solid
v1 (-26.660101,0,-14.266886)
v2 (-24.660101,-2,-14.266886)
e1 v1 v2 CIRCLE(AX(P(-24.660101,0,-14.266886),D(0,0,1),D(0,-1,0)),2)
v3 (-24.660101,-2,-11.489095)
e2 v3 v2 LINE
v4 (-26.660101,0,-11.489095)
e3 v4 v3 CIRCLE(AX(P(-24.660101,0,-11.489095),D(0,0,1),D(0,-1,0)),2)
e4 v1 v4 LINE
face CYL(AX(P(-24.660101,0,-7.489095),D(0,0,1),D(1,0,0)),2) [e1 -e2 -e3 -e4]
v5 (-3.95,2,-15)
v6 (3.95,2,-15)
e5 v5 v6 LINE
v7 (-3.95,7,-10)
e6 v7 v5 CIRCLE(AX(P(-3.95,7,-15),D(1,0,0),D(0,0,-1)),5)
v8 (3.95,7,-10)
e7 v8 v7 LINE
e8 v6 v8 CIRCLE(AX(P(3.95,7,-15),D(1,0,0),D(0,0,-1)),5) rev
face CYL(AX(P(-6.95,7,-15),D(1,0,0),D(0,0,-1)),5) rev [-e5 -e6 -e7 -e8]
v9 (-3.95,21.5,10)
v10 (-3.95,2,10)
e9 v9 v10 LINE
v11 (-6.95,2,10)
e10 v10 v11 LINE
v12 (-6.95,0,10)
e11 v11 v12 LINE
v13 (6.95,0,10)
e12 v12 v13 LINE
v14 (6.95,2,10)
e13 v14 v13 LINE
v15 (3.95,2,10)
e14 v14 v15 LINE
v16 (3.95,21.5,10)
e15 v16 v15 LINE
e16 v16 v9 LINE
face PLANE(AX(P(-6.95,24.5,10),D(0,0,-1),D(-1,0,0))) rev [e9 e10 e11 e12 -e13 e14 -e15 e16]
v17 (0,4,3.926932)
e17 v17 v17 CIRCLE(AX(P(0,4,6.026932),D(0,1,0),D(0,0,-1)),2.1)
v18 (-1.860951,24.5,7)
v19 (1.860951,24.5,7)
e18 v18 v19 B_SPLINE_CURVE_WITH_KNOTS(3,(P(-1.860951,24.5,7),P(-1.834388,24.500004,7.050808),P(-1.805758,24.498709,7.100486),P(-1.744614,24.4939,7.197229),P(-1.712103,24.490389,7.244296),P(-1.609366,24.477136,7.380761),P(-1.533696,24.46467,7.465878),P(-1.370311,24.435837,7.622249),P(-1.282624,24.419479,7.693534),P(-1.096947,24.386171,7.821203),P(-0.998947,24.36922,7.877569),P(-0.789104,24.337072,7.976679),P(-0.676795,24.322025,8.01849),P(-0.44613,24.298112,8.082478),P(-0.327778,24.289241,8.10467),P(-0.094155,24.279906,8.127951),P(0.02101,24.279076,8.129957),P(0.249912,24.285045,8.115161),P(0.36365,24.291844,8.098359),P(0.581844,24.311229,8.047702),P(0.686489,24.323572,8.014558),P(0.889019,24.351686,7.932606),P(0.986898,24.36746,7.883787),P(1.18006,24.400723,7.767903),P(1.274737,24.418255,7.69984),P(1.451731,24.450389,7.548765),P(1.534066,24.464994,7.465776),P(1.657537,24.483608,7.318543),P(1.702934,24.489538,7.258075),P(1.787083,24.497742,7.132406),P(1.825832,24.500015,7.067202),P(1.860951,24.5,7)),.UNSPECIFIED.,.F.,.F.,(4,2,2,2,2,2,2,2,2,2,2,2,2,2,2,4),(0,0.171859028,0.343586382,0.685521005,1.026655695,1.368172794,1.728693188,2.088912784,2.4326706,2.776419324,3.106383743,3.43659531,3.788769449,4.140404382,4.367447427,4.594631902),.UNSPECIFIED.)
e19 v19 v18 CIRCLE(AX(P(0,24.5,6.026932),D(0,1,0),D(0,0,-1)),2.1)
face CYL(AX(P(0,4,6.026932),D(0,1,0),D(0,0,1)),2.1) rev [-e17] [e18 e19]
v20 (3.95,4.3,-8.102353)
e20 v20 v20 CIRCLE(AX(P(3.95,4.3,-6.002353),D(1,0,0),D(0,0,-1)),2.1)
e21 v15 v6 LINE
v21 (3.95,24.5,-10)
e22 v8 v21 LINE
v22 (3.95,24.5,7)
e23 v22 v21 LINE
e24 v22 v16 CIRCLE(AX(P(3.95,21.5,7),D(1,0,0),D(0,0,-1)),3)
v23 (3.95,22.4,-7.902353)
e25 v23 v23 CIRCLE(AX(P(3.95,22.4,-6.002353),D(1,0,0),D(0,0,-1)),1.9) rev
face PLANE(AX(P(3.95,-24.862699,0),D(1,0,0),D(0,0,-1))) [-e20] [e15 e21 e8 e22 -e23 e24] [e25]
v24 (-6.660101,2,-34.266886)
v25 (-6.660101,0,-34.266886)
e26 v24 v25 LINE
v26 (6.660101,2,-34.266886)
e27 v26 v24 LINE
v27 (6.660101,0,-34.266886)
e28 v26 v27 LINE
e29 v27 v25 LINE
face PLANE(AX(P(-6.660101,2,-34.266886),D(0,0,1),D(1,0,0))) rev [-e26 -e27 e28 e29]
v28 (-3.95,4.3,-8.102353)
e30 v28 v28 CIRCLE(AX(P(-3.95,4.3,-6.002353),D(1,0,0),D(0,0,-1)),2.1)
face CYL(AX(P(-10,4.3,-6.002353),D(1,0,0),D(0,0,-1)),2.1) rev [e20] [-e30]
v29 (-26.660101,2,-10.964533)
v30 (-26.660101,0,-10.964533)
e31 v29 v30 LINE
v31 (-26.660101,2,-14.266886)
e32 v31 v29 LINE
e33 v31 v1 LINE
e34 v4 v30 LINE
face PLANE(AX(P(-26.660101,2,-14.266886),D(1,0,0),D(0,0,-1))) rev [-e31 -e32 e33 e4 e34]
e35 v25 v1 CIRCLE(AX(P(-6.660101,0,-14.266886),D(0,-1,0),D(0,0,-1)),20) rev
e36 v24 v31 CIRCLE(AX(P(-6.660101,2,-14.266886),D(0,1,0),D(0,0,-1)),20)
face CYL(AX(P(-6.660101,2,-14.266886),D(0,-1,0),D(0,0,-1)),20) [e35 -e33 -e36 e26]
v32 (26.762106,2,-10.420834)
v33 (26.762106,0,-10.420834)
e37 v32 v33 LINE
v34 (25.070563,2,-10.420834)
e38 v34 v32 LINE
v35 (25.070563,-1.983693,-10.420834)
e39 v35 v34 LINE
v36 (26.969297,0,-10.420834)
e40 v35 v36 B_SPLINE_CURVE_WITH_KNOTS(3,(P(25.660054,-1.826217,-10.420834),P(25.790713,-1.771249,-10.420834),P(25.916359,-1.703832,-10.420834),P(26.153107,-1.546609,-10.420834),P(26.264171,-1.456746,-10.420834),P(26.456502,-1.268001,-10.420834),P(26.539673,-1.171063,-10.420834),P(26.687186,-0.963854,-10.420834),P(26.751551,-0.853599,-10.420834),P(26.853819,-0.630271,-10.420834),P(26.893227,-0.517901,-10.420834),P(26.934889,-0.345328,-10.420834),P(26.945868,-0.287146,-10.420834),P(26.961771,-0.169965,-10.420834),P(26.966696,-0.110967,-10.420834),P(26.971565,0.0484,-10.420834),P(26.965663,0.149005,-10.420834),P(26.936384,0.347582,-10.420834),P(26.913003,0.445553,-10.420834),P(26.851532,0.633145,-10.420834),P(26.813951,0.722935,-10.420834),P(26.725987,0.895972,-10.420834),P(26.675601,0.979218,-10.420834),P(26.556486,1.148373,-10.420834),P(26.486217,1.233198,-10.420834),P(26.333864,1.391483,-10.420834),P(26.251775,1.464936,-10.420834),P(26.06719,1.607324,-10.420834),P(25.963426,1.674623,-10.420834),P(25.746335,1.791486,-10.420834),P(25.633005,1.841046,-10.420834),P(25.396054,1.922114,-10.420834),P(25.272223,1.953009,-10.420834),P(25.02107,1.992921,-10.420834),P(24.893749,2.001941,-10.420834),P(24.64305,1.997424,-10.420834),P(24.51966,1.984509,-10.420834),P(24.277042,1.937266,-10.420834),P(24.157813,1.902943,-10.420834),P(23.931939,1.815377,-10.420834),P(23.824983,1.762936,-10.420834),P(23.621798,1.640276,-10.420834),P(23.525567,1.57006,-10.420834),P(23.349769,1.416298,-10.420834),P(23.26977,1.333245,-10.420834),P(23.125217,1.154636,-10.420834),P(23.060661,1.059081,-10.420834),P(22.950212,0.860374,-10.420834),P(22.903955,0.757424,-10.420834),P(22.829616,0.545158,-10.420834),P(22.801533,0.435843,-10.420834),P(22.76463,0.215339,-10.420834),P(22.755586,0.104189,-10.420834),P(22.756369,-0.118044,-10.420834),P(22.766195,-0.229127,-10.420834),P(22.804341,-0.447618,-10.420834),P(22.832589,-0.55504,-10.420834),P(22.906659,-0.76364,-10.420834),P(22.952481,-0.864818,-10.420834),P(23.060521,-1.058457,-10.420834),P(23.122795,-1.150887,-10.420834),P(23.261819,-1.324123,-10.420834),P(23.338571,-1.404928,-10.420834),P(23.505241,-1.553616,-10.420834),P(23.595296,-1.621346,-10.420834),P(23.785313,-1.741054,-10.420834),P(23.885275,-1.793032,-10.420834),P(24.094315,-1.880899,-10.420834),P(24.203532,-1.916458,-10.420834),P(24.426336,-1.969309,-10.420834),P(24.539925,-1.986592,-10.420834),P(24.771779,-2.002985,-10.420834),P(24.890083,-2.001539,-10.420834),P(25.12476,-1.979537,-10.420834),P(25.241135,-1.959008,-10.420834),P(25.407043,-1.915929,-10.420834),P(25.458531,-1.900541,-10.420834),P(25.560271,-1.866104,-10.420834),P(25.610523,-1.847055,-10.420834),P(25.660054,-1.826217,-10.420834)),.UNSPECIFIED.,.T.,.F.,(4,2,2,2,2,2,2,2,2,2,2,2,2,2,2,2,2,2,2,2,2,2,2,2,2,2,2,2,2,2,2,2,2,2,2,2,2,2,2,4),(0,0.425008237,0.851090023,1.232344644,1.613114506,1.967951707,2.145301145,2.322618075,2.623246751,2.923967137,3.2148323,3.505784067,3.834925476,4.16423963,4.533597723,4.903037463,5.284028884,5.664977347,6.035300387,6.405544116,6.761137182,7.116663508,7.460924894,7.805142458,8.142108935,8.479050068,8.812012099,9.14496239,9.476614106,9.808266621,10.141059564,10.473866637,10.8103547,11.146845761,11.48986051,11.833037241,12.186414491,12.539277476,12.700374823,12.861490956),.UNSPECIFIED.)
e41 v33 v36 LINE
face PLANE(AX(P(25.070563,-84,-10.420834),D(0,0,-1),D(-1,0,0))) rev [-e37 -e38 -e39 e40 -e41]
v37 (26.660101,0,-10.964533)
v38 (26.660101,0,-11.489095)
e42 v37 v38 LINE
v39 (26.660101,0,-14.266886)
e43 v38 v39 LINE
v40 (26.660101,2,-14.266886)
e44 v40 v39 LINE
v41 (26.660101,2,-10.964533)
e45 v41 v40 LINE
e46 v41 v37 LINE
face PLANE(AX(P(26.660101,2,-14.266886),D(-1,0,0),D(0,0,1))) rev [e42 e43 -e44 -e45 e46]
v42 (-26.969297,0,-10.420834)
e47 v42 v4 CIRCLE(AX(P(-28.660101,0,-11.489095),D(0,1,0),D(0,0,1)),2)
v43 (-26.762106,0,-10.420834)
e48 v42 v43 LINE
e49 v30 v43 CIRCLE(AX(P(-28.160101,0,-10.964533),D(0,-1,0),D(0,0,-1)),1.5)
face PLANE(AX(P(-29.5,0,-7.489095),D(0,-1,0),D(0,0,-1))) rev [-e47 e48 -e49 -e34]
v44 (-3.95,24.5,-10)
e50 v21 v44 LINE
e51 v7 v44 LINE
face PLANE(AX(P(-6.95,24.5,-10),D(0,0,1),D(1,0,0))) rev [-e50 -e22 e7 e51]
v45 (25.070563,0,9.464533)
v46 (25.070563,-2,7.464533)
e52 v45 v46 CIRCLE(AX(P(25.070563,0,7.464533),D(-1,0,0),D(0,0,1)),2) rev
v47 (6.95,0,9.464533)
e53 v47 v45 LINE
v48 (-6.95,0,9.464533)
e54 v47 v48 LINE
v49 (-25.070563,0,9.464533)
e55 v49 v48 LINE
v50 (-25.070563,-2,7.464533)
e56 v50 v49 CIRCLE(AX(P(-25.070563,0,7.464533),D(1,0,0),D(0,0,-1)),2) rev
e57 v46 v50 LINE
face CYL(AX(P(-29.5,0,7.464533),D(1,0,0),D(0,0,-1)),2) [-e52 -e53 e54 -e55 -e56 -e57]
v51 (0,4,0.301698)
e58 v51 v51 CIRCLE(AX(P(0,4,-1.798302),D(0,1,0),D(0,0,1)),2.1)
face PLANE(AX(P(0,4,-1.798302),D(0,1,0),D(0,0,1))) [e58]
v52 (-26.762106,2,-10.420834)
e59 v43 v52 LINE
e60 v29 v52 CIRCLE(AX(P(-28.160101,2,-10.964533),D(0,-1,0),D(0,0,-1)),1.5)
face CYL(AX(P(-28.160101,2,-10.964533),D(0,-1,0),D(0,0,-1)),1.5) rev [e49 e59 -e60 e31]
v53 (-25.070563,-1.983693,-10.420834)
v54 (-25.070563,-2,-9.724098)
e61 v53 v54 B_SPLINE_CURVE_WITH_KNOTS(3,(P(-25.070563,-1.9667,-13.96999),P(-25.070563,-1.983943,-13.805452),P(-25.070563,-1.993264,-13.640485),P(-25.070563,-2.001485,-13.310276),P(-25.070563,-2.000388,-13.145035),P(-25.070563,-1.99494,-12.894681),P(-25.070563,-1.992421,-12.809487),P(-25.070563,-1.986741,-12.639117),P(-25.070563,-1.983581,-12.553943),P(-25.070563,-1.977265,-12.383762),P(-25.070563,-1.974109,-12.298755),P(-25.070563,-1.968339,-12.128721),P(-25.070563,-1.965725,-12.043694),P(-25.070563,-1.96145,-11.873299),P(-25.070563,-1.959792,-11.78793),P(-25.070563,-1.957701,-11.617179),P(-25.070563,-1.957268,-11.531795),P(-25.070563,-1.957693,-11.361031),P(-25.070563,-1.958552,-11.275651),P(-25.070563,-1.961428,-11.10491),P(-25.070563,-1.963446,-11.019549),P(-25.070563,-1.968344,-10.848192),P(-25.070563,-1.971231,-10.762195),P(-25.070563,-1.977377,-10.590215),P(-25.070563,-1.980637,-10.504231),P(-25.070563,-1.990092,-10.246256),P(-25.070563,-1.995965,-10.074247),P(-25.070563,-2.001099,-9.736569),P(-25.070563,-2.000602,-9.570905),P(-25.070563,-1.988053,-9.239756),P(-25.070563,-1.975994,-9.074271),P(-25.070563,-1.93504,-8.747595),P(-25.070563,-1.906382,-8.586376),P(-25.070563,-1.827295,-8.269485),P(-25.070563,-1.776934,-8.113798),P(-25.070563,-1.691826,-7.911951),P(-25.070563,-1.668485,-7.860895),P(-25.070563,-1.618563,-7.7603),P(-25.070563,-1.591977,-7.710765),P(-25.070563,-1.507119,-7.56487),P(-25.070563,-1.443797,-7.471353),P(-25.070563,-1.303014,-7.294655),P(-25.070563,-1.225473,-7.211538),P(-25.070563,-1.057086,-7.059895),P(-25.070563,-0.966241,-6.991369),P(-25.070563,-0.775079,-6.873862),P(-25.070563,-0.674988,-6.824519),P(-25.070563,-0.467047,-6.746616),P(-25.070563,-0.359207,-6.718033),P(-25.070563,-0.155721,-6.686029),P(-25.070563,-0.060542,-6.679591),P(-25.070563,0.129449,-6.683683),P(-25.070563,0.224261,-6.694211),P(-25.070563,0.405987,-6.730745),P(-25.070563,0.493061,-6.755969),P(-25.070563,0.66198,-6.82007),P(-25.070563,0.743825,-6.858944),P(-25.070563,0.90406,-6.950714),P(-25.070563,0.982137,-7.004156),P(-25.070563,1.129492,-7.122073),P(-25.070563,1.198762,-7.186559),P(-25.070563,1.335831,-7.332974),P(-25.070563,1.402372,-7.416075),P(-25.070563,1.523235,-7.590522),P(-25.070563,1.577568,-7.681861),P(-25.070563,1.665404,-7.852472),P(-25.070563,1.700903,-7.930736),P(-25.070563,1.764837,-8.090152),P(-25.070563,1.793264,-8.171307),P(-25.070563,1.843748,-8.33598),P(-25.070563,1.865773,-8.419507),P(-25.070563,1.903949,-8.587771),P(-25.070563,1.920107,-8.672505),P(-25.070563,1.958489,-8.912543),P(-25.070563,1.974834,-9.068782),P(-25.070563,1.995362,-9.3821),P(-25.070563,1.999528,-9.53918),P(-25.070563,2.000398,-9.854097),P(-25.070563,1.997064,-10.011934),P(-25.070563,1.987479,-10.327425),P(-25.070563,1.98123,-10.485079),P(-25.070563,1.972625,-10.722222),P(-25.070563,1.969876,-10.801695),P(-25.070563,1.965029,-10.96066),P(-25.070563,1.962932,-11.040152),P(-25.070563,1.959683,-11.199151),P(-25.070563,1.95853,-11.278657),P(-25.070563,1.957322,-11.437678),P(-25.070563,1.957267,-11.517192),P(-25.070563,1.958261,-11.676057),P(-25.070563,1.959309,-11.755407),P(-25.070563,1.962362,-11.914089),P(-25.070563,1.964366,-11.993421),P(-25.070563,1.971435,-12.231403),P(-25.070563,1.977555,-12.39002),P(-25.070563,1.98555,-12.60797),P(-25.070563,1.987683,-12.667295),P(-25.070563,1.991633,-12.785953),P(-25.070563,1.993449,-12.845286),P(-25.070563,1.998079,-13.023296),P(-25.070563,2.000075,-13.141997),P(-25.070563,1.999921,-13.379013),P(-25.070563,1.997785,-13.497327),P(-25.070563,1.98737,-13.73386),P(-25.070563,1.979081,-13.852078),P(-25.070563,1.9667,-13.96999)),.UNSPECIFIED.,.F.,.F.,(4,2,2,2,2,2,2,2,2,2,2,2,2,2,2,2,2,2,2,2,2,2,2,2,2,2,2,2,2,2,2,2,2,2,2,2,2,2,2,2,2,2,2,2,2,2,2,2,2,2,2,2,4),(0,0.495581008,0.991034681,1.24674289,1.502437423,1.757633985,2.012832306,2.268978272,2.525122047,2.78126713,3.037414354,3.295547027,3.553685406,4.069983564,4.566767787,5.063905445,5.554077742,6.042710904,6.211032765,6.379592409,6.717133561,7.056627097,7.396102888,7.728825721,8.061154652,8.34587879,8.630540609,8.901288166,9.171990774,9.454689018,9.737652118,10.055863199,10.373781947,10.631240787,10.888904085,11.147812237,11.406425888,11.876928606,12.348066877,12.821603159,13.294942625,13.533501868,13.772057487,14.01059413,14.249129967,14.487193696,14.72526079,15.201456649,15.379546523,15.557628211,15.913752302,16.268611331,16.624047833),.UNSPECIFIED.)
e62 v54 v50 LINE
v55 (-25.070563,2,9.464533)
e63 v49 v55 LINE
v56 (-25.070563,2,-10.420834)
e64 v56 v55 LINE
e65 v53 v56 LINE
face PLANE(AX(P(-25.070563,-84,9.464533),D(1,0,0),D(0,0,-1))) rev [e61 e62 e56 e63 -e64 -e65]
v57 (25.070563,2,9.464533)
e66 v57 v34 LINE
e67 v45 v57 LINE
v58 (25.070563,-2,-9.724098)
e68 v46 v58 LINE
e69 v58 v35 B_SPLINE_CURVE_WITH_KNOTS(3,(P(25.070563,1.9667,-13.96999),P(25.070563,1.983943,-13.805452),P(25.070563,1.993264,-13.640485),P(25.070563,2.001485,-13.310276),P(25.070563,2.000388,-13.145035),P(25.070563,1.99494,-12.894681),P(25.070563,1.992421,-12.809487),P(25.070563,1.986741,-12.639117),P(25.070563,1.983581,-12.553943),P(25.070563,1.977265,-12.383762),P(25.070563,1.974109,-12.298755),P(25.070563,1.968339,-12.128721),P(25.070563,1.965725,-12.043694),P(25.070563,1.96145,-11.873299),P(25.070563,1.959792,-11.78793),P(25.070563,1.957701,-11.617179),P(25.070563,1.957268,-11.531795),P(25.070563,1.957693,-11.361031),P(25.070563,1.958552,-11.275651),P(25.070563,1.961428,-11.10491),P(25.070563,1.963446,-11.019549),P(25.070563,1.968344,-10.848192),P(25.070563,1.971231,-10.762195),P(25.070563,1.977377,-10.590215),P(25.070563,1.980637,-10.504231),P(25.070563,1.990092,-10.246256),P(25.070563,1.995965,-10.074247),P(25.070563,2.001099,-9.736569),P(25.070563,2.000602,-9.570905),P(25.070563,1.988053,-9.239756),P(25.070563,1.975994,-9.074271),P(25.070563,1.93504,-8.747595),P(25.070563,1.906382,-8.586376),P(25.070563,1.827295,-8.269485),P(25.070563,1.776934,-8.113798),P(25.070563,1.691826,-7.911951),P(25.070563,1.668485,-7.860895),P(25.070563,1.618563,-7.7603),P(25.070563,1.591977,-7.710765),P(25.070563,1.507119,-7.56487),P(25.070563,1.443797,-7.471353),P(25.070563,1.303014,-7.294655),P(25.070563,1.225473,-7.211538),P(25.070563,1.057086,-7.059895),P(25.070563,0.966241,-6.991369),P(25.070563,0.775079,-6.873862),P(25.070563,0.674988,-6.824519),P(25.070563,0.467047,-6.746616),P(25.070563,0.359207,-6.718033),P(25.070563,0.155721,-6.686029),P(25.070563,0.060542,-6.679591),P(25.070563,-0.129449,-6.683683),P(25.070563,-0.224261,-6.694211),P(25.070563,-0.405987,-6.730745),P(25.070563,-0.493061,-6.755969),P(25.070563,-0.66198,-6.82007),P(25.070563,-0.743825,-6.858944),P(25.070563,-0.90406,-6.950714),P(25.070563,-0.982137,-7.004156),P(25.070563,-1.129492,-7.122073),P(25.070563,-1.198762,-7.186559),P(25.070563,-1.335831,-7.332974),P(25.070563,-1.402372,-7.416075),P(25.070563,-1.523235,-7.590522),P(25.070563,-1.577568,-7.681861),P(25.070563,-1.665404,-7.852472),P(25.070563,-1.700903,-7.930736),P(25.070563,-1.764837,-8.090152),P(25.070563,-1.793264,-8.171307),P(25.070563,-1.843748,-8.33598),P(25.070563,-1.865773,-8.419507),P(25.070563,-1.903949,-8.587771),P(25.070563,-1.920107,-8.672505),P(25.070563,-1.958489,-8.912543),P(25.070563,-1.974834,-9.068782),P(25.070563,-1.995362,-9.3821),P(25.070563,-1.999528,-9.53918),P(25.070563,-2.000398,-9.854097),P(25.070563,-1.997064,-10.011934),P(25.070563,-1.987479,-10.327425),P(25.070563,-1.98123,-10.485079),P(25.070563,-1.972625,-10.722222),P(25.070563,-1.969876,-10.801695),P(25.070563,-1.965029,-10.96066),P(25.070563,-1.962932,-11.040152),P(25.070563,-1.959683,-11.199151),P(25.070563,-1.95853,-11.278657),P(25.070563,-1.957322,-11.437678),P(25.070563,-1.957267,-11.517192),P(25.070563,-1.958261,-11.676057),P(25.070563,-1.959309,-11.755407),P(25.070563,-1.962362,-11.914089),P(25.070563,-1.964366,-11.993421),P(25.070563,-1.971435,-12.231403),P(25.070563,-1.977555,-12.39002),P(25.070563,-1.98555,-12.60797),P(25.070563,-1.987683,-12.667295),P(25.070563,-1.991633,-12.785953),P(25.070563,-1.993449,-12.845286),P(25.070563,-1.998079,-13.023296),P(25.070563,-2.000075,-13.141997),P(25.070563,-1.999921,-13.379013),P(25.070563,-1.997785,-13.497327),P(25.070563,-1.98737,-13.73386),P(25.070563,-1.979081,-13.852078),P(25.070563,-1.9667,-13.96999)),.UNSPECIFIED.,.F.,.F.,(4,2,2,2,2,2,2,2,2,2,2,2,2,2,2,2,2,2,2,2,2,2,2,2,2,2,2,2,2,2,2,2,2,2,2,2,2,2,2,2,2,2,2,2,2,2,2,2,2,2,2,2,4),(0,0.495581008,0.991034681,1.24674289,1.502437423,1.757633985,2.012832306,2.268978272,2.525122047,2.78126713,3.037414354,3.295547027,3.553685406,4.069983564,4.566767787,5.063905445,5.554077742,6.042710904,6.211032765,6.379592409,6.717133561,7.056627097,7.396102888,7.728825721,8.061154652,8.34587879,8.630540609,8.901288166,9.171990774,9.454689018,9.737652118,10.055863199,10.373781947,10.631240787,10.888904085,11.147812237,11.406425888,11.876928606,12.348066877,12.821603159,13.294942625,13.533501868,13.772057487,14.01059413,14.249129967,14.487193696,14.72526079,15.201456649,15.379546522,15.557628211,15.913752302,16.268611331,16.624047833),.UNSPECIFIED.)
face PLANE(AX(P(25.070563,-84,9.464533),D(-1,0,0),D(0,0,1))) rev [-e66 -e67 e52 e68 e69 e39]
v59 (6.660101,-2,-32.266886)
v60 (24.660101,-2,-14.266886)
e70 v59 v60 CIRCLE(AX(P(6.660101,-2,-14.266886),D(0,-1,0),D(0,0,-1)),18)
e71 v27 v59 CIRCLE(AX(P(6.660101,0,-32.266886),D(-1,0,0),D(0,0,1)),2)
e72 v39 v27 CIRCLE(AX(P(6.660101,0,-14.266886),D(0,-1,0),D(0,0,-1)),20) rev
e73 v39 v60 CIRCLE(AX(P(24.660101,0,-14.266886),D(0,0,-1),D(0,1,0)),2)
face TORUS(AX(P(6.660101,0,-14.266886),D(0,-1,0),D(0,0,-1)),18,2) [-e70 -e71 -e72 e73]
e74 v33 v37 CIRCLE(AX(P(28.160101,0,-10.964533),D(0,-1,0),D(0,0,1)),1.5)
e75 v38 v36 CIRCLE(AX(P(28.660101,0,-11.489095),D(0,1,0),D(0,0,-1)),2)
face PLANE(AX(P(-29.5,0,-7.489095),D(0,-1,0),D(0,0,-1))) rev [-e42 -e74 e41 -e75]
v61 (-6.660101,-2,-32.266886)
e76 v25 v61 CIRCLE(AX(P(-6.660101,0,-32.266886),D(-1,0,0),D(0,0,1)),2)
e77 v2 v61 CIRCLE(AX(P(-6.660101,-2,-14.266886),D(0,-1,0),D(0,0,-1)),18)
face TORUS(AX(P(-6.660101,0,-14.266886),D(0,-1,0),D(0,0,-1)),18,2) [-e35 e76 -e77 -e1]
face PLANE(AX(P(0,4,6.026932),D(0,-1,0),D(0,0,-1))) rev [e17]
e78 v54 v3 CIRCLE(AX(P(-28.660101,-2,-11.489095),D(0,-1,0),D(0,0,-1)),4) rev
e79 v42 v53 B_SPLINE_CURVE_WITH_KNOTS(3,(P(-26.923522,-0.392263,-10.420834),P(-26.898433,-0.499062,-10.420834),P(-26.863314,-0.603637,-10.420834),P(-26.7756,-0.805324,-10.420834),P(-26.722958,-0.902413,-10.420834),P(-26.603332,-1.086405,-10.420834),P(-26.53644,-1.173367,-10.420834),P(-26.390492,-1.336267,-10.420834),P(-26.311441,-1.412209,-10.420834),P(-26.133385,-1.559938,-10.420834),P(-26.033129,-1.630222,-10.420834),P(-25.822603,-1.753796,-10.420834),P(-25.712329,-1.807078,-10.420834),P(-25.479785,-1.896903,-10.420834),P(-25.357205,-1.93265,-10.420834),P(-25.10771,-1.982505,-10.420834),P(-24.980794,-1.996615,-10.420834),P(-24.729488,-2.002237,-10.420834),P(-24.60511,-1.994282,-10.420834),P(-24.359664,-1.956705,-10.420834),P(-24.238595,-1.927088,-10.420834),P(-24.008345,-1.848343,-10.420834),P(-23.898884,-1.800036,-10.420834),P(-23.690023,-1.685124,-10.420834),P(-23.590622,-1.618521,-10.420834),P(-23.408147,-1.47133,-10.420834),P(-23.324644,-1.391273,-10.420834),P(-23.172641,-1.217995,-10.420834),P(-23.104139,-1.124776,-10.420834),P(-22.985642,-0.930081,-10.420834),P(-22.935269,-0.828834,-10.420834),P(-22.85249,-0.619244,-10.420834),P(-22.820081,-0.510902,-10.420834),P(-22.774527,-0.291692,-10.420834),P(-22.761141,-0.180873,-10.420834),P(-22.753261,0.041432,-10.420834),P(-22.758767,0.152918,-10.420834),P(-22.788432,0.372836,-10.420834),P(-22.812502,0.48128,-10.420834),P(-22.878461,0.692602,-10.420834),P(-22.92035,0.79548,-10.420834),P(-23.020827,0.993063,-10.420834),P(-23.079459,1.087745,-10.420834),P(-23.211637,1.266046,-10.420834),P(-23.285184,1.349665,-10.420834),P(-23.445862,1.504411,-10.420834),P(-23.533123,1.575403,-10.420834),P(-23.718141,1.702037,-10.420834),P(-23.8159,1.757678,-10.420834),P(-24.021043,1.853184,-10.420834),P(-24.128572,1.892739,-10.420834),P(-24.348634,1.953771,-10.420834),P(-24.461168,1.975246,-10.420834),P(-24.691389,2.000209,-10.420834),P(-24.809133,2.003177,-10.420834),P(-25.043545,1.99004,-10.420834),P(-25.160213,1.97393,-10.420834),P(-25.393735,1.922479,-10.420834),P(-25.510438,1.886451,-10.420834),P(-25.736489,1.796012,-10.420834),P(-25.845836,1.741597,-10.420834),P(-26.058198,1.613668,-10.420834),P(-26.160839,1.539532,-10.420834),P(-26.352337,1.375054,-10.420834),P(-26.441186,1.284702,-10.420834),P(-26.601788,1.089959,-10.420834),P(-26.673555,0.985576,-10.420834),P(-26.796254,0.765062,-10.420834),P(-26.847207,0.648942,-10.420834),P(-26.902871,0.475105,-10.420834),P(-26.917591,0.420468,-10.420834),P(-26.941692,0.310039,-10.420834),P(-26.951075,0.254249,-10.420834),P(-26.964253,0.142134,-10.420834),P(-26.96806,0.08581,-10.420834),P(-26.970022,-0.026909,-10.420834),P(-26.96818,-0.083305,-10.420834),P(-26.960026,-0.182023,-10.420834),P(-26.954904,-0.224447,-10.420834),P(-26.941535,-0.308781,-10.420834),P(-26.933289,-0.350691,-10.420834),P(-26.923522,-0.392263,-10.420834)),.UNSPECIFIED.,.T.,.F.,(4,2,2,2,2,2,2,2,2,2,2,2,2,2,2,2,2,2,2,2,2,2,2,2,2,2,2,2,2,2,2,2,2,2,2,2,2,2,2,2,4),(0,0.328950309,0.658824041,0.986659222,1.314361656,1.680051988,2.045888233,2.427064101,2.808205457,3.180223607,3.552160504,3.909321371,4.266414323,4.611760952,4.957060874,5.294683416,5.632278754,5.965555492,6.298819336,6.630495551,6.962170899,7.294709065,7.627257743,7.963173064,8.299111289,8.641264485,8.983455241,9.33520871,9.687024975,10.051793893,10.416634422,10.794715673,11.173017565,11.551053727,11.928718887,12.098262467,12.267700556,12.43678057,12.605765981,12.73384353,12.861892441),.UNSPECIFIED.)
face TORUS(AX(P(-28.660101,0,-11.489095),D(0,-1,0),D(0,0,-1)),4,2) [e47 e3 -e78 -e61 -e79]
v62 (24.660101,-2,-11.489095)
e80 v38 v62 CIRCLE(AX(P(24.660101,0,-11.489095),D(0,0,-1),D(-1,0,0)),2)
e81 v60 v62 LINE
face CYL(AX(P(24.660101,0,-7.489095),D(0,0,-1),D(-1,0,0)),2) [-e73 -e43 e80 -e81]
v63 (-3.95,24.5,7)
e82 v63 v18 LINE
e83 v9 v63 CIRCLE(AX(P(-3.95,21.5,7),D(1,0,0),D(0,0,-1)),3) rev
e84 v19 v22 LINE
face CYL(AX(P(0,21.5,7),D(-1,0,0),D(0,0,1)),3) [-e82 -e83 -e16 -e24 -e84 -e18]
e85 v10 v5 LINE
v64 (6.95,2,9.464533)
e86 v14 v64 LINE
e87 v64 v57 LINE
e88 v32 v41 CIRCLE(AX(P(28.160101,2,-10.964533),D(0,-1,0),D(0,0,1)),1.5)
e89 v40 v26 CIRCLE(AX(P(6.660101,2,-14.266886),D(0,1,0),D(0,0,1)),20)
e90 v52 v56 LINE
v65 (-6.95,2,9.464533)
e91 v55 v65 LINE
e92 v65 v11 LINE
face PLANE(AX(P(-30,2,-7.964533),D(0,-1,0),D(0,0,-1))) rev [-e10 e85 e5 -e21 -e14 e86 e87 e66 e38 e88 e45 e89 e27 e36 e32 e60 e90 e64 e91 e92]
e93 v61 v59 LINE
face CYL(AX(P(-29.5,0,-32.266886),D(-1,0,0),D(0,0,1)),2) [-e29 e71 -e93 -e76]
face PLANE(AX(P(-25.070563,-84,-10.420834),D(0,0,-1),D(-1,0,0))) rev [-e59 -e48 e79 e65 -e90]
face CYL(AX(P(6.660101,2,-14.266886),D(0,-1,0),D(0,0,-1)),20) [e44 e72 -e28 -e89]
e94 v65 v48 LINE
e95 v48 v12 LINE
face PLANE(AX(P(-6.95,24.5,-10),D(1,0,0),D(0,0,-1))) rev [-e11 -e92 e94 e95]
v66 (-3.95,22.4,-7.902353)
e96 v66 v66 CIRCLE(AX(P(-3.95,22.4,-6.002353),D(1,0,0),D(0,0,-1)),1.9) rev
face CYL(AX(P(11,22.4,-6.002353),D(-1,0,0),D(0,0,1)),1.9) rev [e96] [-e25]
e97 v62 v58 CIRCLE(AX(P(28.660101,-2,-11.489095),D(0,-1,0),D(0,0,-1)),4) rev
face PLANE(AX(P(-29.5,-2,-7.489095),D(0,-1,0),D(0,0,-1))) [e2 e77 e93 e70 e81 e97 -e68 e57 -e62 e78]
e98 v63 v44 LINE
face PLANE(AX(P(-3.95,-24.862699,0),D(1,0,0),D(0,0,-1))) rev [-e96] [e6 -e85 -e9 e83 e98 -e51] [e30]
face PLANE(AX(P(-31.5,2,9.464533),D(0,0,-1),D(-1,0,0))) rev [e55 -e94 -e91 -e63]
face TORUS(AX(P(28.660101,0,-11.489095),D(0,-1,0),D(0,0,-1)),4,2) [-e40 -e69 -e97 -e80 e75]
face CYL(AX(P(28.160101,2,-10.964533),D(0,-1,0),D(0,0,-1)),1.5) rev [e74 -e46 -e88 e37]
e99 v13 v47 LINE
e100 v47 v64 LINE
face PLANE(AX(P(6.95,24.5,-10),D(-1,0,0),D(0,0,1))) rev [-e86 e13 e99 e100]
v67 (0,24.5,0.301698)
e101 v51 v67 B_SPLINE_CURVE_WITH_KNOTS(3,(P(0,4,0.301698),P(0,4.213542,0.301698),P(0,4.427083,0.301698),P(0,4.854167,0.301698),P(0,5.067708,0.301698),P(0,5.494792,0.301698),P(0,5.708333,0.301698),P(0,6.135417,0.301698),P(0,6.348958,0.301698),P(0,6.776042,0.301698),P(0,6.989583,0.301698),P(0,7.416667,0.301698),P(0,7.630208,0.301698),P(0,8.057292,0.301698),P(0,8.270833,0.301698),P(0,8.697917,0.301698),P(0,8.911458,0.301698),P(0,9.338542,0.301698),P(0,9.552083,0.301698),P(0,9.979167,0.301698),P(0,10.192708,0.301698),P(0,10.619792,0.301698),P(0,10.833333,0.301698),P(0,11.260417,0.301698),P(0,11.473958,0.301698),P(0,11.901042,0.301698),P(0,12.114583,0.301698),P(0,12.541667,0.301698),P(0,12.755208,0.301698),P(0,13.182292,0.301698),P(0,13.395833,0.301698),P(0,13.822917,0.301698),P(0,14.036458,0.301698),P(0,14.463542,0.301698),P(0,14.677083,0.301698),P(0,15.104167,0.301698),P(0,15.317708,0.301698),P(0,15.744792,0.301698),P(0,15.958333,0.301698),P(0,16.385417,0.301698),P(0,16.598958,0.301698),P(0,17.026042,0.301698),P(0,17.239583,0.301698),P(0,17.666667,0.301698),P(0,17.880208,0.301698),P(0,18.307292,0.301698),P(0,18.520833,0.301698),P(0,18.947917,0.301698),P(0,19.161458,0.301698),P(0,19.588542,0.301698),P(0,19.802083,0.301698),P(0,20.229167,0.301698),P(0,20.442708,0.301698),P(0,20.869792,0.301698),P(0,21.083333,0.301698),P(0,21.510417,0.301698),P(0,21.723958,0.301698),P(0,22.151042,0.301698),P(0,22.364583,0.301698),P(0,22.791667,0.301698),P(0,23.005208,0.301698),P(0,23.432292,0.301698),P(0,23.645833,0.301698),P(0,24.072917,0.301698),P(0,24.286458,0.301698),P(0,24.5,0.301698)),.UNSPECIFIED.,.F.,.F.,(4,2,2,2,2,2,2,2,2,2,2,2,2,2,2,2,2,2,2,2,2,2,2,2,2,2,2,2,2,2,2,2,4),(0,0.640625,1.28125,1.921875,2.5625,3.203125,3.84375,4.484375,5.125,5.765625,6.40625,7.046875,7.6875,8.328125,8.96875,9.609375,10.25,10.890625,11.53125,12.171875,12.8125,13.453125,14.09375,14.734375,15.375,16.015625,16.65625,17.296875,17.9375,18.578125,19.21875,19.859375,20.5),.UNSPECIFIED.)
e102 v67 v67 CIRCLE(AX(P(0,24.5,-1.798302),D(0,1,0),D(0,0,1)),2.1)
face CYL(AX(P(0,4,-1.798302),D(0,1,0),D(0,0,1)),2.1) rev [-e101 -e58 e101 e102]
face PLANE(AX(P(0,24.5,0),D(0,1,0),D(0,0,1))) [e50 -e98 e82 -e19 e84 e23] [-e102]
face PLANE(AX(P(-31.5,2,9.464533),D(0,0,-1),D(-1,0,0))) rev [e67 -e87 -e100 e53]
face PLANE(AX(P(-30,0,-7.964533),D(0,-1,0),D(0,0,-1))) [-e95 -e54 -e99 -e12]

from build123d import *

# Parameters (mm, degrees)
SALIENTE_EXTRUIR1_DEPTH     = 2
CROQUIS2_W                  = 13.9
CROQUIS2_H                  = 20
SALIENTE_EXTRUIR2_DEPTH     = 24.5
SALIENTE_EXTRUIR3_DEPTH     = 22.5
CROQUIS5_R                  = 2.1
CORTAR_EXTRUIR2_DEPTH       = 20.5
CROQUIS16_W                 = 3
CROQUIS16_H                 = 33.930468167
CORTAR_EXTRUIR8_DEPTH       = 22.5
CORTAR_EXTRUIR1_DEPTH       = 27
CORTAR_EXTRUIR1_DEPTH_BACK  = 65.5
CROQUIS4_R                  = 1.599999999
REDONDEO1_R                 = 3
REDONDEO2_R                 = 5
SALIENTE_EXTRUIR5_START     = 2
SALIENTE_EXTRUIR5_DEPTH     = 2
REDONDEO6_R                 = 2
REDONDEO7_R                 = 2
CROQUIS17_R                 = 2.1
CORTAR_EXTRUIR9_DEPTH       = 10
CORTAR_EXTRUIR14_DEPTH      = 11
CORTAR_EXTRUIR14_DEPTH_BACK = 10
CROQUIS18_R                 = 1.9
CROQUIS19_R                 = 18.5
CORTAR_EXTRUIR15_DEPTH      = 3.5
CORTAR_EXTRUIR16_START      = -56
CROQUIS20_R                 = 18.5
CORTAR_EXTRUIR16_DEPTH      = 3.5
CORTAR_EXTRUIR17_DEPTH      = 47
CORTAR_EXTRUIR17_DEPTH_BACK = 86
CROQUIS21_W                 = 7.397871061
CROQUIS21_H                 = 19.885366365


# Some blends are built 0.0001 mm under size
with BuildPart() as part:
    # Croquis1 → Saliente-Extruir1 (new body)
    with BuildSketch(Plane(origin=(0, 0, 0), x_dir=(1, 0, 0), z_dir=(0, 1, 0))):
        with BuildLine():
            Line((-31.5, -9.464532567), (31.5, -9.464532567))
            Line((31.5, -9.464532567), (31.5, 7.964532567))
            ThreePointArc((31.5, 7.964532567), (31.060660172, 9.025192739), (30, 9.464532567))
            Line((30, 9.464532567), (28.160101256, 9.464532567))
            ThreePointArc((28.160101256, 9.464532567), (27.099441084, 9.903872396), (26.660101256, 10.964532567))
            Line((26.660101256, 10.964532567), (26.660101256, 14.266885585))
            ThreePointArc((26.660101256, 14.266885585), (20.802236879, 28.409021208), (6.660101256, 34.266885585))
            Line((6.660101256, 34.266885585), (-6.660101256, 34.266885585))
            ThreePointArc((-6.660101256, 34.266885585), (-20.802236879, 28.409021208), (-26.660101256, 14.266885585))
            Line((-26.660101256, 14.266885585), (-26.660101256, 10.964532567))
            ThreePointArc((-26.660101256, 10.964532567), (-27.099441084, 9.903872396), (-28.160101256, 9.464532567))
            Line((-28.160101256, 9.464532567), (-30, 9.464532567))
            ThreePointArc((-30, 9.464532567), (-31.060660172, 9.025192739), (-31.5, 7.964532567))
            Line((-31.5, 7.964532567), (-31.5, -9.464532567))
        make_face()
    extrude(amount=SALIENTE_EXTRUIR1_DEPTH)

    # Croquis2 → Saliente-Extruir2 (add)
    with BuildSketch(Plane(origin=(0, 0, 0), x_dir=(1, 0, 0), z_dir=(0, 1, 0))):
        Rectangle(CROQUIS2_W, CROQUIS2_H)
    extrude(amount=SALIENTE_EXTRUIR2_DEPTH)

    # Croquis3 → Saliente-Extruir3 (add)
    with BuildSketch(Plane(origin=(0, 2, 0), x_dir=(1, 0, 0), z_dir=(0, 1, 0))):
        with BuildLine():
            ThreePointArc((28.160101256, 9.464532567), (27.375457574, 9.686121721), (26.822638598, 10.285420177))
            Line((26.822638598, 10.285420177), (25.6, 10.285420177))
            Line((25.6, 10.285420177), (25.6, -2.749999823))
            Line((25.6, -2.749999823), (31.5, -2.749999823))
            Line((31.5, -2.749999823), (31.5, 7.964532567))
            ThreePointArc((31.5, 7.964532567), (31.060660172, 9.025192739), (30, 9.464532567))
            Line((30, 9.464532567), (28.160101256, 9.464532567))
        make_face()
        with BuildLine():
            Line((-25.6, 10.285420177), (-26.822638598, 10.285420177))
            ThreePointArc((-26.822638598, 10.285420177), (-27.375457574, 9.686121721), (-28.160101256, 9.464532567))
            Line((-28.160101256, 9.464532567), (-30, 9.464532567))
            ThreePointArc((-30, 9.464532567), (-31.060660172, 9.025192739), (-31.5, 7.964532567))
            Line((-31.5, 7.964532567), (-31.5, -2.749999823))
            Line((-31.5, -2.749999823), (-25.6, -2.749999823))
            Line((-25.6, -2.749999823), (-25.6, 10.285420177))
        make_face()
    extrude(amount=SALIENTE_EXTRUIR3_DEPTH)

    # Croquis5 → Cortar-Extruir2 (cut)
    with BuildSketch(Plane(origin=(0, 24.5, 0), x_dir=(1, 0, 0), z_dir=(0, 1, 0))):
        with Locations(Location((0, 1.798301608, 0), (0, 0, 270))):
            Circle(CROQUIS5_R)
        with Locations(Location((0, -6.026932469, 0), (0, 0, 270))):
            Circle(CROQUIS5_R)
        with Locations(Location((-28.55, 1.798301608, 0), (0, 0, 270))):
            Circle(CROQUIS5_R)
        with Locations(Location((28.55, 1.798301608, 0), (0, 0, 270))):
            Circle(CROQUIS5_R)
    extrude(amount=-CORTAR_EXTRUIR2_DEPTH, mode=Mode.SUBTRACT)

    # Croquis16 → Cortar-Extruir8 (cut)
    with BuildSketch(Plane(origin=(0, 24.5, 0), x_dir=(1, 0, 0), z_dir=(0, 1, 0))):
        with Locations((5.45, 0.270579682)):
            Rectangle(CROQUIS16_W, CROQUIS16_H)
        with Locations((-5.45, 0.270579682)):
            Rectangle(CROQUIS16_W, CROQUIS16_H)
    extrude(amount=-CORTAR_EXTRUIR8_DEPTH, mode=Mode.SUBTRACT)

    # Croquis4 → Cortar-Extruir1 (cut, two sides: drawn at the far end of the back side and taken through both)
    with BuildSketch(Plane.ZY.offset(25.5).offset(-CORTAR_EXTRUIR1_DEPTH_BACK)):
        with Locations(Location((-6.002353017, 4.3, 0), (0, 0, 180))):
            Circle(CROQUIS4_R)
        with Locations(Location((-6.002353017, 22.4, 0), (0, 0, 180))):
            Circle(CROQUIS4_R)
    extrude(amount=CORTAR_EXTRUIR1_DEPTH + CORTAR_EXTRUIR1_DEPTH_BACK, mode=Mode.SUBTRACT)

    # Redondeo1
    # the kernel refuses this fillet: 3 mm, written as the material it adds along each edge
    with BuildSketch(Plane(origin=(25.6, 2, 2.749999823), x_dir=(0, 0, 1), z_dir=(1, 0, 0))) as redondeo1_piece_1:
        with BuildLine():
            CenterArc((REDONDEO1_R, -REDONDEO1_R), REDONDEO1_R, 90, 90)
            Line((0, -REDONDEO1_R), (0, 0))
            Line((0, 0), (REDONDEO1_R, 0))
        make_face()
    extrude(amount=5.9)
    # the kernel refuses this fillet: 3 mm, written as the material it takes off along each edge
    with BuildSketch(Plane(origin=(11.45, 24.5, 10), x_dir=(0, 0, -1), z_dir=(-1, 0, 0))) as redondeo1_2_piece_1:
        with BuildLine():
            CenterArc((REDONDEO1_R, REDONDEO1_R), REDONDEO1_R, 180, 90)
            Line((0, REDONDEO1_R), (0, 0))
            Line((0, 0), (REDONDEO1_R, 0))
        make_face()
    extrude(amount=22.9, mode=Mode.SUBTRACT)

    # Redondeo2
    redondeo2_edges = [part.edges().sort_by_distance(p)[0] for p in [
        (0, 2, -10),
    ]]
    fillet(redondeo2_edges, radius=REDONDEO2_R)

    # Croquis15 → Saliente-Extruir5 (add)
    with BuildSketch(Plane.XZ.offset(SALIENTE_EXTRUIR5_START)):
        with BuildLine():
            Line((-31.5, 9.464532567), (31.5, 9.464532567))
            Line((31.5, 9.464532567), (31.5, -7.489095092))
            ThreePointArc((31.5, -7.489095092), (30.914213562, -8.903308654), (29.5, -9.489095092))
            Line((29.5, -9.489095092), (28.660101256, -9.489095092))
            ThreePointArc((28.660101256, -9.489095092), (27.245887693, -10.074881529), (26.660101256, -11.489095092))
            Line((26.660101256, -11.489095092), (26.660101256, -14.266885585))
            ThreePointArc((26.660101256, -14.266885585), (20.802236879, -28.409021208), (6.660101256, -34.266885585))
            Line((6.660101256, -34.266885585), (1.137553535, -34.266885585))
            Line((1.137553535, -34.266885585), (-1.137553535, -34.266885585))
            Line((-1.137553535, -34.266885585), (-6.660101256, -34.266885585))
            ThreePointArc((-6.660101256, -34.266885585), (-20.802236879, -28.409021208), (-26.660101256, -14.266885585))
            Line((-26.660101256, -14.266885585), (-26.660101256, -11.489095092))
            ThreePointArc((-26.660101256, -11.489095092), (-27.245887693, -10.074881529), (-28.660101256, -9.489095092))
            Line((-28.660101256, -9.489095092), (-29.5, -9.489095092))
            ThreePointArc((-29.5, -9.489095092), (-30.914213562, -8.903308654), (-31.5, -7.489095092))
            Line((-31.5, -7.489095092), (-31.5, 9.464532567))
        make_face()
    extrude(amount=-SALIENTE_EXTRUIR5_DEPTH)

    # Redondeo6
    redondeo6_edges = [part.edges().sort_by_distance(p)[0] for p in [
        (-31.5, -2, 0.987718738),
        (-30.914213562, -2, -8.903308654),
        (-29.080050628, -2, -9.489095092),
        (-27.245887693, -2, -10.074881529),
        (-26.660101256, -2, -12.877990338),
        (-20.802236879, -2, -28.409021208),
        (0, -2, -34.266885585),
        (20.802236879, -2, -28.409021208),
        (26.660101256, -2, -12.877990338),
        (27.245887693, -2, -10.074881529),
        (29.080050628, -2, -9.489095092),
        (30.914213562, -2, -8.903308654),
        (31.5, -2, 0.987718738),
    ]]
    fillet(redondeo6_edges, radius=REDONDEO6_R - 0.0001)  # a hair under: the kernel refuses the full size

    # Redondeo7
    redondeo7_edges = [part.edges().sort_by_distance(p)[0] for p in [
        (31.5, 0.99995, 9.464532567),
        (-31.5, 0.99995, 9.464532567),
        (0, -2, 9.464532567),
        (30.914242852, -1.414242852, 9.464532567),
        (-30.914242852, -1.414242852, 9.464532567),
    ]]
    fillet(redondeo7_edges, radius=REDONDEO7_R - 0.0001)  # a hair under: the kernel refuses the full size

    # Croquis17 → Cortar-Extruir9 (cut, symmetric)
    with BuildSketch(Plane(origin=(0, 0, 0), x_dir=(0, 0, -1), z_dir=(1, 0, 0))):
        with Locations((6.002353017, 4.3)):
            Circle(CROQUIS17_R)
    extrude(amount=CORTAR_EXTRUIR9_DEPTH, both=True, mode=Mode.SUBTRACT)

    # Croquis18 → Cortar-Extruir14 (cut, two sides: drawn at the far end of the back side and taken through both)
    with BuildSketch(Plane(origin=(0, 0, 0), x_dir=(0, 0, -1), z_dir=(1, 0, 0)).offset(-CORTAR_EXTRUIR14_DEPTH_BACK)):
        with Locations((6.002353017, 22.4)):
            Circle(CROQUIS18_R)
    extrude(amount=CORTAR_EXTRUIR14_DEPTH + CORTAR_EXTRUIR14_DEPTH_BACK, mode=Mode.SUBTRACT)

    # Croquis19 → Cortar-Extruir15 (cut)
    with BuildSketch(Plane(origin=(31.5, 0, 0), x_dir=(0, 0, -1), z_dir=(1, 0, 0))):
        with Locations((25.179802512, 14.045485316)):
            Circle(CROQUIS19_R)
    extrude(amount=-CORTAR_EXTRUIR15_DEPTH, mode=Mode.SUBTRACT)

    # Croquis20 → Cortar-Extruir16 (cut)
    with BuildSketch(Plane(origin=(28, 0, 0), x_dir=(0, 0, -1), z_dir=(1, 0, 0)).offset(CORTAR_EXTRUIR16_START)):
        with Locations((25.179802512, 14.045485316)):
            Circle(CROQUIS20_R)
    extrude(amount=-CORTAR_EXTRUIR16_DEPTH, mode=Mode.SUBTRACT)

    # Croquis21 → Cortar-Extruir17 (cut, two sides: drawn at the far end of the back side and taken through both)
    with BuildSketch(Plane(origin=(0, 2, 0), x_dir=(1, 0, 0), z_dir=(0, 1, 0)).offset(-CORTAR_EXTRUIR17_DEPTH_BACK)):
        with Locations((-28.769498571, 0.478150615)):
            Rectangle(CROQUIS21_W, CROQUIS21_H)
        with Locations((28.769498571, 0.478150615)):
            Rectangle(CROQUIS21_W, CROQUIS21_H)
    extrude(amount=CORTAR_EXTRUIR17_DEPTH + CORTAR_EXTRUIR17_DEPTH_BACK, mode=Mode.SUBTRACT)


solid = part.part
